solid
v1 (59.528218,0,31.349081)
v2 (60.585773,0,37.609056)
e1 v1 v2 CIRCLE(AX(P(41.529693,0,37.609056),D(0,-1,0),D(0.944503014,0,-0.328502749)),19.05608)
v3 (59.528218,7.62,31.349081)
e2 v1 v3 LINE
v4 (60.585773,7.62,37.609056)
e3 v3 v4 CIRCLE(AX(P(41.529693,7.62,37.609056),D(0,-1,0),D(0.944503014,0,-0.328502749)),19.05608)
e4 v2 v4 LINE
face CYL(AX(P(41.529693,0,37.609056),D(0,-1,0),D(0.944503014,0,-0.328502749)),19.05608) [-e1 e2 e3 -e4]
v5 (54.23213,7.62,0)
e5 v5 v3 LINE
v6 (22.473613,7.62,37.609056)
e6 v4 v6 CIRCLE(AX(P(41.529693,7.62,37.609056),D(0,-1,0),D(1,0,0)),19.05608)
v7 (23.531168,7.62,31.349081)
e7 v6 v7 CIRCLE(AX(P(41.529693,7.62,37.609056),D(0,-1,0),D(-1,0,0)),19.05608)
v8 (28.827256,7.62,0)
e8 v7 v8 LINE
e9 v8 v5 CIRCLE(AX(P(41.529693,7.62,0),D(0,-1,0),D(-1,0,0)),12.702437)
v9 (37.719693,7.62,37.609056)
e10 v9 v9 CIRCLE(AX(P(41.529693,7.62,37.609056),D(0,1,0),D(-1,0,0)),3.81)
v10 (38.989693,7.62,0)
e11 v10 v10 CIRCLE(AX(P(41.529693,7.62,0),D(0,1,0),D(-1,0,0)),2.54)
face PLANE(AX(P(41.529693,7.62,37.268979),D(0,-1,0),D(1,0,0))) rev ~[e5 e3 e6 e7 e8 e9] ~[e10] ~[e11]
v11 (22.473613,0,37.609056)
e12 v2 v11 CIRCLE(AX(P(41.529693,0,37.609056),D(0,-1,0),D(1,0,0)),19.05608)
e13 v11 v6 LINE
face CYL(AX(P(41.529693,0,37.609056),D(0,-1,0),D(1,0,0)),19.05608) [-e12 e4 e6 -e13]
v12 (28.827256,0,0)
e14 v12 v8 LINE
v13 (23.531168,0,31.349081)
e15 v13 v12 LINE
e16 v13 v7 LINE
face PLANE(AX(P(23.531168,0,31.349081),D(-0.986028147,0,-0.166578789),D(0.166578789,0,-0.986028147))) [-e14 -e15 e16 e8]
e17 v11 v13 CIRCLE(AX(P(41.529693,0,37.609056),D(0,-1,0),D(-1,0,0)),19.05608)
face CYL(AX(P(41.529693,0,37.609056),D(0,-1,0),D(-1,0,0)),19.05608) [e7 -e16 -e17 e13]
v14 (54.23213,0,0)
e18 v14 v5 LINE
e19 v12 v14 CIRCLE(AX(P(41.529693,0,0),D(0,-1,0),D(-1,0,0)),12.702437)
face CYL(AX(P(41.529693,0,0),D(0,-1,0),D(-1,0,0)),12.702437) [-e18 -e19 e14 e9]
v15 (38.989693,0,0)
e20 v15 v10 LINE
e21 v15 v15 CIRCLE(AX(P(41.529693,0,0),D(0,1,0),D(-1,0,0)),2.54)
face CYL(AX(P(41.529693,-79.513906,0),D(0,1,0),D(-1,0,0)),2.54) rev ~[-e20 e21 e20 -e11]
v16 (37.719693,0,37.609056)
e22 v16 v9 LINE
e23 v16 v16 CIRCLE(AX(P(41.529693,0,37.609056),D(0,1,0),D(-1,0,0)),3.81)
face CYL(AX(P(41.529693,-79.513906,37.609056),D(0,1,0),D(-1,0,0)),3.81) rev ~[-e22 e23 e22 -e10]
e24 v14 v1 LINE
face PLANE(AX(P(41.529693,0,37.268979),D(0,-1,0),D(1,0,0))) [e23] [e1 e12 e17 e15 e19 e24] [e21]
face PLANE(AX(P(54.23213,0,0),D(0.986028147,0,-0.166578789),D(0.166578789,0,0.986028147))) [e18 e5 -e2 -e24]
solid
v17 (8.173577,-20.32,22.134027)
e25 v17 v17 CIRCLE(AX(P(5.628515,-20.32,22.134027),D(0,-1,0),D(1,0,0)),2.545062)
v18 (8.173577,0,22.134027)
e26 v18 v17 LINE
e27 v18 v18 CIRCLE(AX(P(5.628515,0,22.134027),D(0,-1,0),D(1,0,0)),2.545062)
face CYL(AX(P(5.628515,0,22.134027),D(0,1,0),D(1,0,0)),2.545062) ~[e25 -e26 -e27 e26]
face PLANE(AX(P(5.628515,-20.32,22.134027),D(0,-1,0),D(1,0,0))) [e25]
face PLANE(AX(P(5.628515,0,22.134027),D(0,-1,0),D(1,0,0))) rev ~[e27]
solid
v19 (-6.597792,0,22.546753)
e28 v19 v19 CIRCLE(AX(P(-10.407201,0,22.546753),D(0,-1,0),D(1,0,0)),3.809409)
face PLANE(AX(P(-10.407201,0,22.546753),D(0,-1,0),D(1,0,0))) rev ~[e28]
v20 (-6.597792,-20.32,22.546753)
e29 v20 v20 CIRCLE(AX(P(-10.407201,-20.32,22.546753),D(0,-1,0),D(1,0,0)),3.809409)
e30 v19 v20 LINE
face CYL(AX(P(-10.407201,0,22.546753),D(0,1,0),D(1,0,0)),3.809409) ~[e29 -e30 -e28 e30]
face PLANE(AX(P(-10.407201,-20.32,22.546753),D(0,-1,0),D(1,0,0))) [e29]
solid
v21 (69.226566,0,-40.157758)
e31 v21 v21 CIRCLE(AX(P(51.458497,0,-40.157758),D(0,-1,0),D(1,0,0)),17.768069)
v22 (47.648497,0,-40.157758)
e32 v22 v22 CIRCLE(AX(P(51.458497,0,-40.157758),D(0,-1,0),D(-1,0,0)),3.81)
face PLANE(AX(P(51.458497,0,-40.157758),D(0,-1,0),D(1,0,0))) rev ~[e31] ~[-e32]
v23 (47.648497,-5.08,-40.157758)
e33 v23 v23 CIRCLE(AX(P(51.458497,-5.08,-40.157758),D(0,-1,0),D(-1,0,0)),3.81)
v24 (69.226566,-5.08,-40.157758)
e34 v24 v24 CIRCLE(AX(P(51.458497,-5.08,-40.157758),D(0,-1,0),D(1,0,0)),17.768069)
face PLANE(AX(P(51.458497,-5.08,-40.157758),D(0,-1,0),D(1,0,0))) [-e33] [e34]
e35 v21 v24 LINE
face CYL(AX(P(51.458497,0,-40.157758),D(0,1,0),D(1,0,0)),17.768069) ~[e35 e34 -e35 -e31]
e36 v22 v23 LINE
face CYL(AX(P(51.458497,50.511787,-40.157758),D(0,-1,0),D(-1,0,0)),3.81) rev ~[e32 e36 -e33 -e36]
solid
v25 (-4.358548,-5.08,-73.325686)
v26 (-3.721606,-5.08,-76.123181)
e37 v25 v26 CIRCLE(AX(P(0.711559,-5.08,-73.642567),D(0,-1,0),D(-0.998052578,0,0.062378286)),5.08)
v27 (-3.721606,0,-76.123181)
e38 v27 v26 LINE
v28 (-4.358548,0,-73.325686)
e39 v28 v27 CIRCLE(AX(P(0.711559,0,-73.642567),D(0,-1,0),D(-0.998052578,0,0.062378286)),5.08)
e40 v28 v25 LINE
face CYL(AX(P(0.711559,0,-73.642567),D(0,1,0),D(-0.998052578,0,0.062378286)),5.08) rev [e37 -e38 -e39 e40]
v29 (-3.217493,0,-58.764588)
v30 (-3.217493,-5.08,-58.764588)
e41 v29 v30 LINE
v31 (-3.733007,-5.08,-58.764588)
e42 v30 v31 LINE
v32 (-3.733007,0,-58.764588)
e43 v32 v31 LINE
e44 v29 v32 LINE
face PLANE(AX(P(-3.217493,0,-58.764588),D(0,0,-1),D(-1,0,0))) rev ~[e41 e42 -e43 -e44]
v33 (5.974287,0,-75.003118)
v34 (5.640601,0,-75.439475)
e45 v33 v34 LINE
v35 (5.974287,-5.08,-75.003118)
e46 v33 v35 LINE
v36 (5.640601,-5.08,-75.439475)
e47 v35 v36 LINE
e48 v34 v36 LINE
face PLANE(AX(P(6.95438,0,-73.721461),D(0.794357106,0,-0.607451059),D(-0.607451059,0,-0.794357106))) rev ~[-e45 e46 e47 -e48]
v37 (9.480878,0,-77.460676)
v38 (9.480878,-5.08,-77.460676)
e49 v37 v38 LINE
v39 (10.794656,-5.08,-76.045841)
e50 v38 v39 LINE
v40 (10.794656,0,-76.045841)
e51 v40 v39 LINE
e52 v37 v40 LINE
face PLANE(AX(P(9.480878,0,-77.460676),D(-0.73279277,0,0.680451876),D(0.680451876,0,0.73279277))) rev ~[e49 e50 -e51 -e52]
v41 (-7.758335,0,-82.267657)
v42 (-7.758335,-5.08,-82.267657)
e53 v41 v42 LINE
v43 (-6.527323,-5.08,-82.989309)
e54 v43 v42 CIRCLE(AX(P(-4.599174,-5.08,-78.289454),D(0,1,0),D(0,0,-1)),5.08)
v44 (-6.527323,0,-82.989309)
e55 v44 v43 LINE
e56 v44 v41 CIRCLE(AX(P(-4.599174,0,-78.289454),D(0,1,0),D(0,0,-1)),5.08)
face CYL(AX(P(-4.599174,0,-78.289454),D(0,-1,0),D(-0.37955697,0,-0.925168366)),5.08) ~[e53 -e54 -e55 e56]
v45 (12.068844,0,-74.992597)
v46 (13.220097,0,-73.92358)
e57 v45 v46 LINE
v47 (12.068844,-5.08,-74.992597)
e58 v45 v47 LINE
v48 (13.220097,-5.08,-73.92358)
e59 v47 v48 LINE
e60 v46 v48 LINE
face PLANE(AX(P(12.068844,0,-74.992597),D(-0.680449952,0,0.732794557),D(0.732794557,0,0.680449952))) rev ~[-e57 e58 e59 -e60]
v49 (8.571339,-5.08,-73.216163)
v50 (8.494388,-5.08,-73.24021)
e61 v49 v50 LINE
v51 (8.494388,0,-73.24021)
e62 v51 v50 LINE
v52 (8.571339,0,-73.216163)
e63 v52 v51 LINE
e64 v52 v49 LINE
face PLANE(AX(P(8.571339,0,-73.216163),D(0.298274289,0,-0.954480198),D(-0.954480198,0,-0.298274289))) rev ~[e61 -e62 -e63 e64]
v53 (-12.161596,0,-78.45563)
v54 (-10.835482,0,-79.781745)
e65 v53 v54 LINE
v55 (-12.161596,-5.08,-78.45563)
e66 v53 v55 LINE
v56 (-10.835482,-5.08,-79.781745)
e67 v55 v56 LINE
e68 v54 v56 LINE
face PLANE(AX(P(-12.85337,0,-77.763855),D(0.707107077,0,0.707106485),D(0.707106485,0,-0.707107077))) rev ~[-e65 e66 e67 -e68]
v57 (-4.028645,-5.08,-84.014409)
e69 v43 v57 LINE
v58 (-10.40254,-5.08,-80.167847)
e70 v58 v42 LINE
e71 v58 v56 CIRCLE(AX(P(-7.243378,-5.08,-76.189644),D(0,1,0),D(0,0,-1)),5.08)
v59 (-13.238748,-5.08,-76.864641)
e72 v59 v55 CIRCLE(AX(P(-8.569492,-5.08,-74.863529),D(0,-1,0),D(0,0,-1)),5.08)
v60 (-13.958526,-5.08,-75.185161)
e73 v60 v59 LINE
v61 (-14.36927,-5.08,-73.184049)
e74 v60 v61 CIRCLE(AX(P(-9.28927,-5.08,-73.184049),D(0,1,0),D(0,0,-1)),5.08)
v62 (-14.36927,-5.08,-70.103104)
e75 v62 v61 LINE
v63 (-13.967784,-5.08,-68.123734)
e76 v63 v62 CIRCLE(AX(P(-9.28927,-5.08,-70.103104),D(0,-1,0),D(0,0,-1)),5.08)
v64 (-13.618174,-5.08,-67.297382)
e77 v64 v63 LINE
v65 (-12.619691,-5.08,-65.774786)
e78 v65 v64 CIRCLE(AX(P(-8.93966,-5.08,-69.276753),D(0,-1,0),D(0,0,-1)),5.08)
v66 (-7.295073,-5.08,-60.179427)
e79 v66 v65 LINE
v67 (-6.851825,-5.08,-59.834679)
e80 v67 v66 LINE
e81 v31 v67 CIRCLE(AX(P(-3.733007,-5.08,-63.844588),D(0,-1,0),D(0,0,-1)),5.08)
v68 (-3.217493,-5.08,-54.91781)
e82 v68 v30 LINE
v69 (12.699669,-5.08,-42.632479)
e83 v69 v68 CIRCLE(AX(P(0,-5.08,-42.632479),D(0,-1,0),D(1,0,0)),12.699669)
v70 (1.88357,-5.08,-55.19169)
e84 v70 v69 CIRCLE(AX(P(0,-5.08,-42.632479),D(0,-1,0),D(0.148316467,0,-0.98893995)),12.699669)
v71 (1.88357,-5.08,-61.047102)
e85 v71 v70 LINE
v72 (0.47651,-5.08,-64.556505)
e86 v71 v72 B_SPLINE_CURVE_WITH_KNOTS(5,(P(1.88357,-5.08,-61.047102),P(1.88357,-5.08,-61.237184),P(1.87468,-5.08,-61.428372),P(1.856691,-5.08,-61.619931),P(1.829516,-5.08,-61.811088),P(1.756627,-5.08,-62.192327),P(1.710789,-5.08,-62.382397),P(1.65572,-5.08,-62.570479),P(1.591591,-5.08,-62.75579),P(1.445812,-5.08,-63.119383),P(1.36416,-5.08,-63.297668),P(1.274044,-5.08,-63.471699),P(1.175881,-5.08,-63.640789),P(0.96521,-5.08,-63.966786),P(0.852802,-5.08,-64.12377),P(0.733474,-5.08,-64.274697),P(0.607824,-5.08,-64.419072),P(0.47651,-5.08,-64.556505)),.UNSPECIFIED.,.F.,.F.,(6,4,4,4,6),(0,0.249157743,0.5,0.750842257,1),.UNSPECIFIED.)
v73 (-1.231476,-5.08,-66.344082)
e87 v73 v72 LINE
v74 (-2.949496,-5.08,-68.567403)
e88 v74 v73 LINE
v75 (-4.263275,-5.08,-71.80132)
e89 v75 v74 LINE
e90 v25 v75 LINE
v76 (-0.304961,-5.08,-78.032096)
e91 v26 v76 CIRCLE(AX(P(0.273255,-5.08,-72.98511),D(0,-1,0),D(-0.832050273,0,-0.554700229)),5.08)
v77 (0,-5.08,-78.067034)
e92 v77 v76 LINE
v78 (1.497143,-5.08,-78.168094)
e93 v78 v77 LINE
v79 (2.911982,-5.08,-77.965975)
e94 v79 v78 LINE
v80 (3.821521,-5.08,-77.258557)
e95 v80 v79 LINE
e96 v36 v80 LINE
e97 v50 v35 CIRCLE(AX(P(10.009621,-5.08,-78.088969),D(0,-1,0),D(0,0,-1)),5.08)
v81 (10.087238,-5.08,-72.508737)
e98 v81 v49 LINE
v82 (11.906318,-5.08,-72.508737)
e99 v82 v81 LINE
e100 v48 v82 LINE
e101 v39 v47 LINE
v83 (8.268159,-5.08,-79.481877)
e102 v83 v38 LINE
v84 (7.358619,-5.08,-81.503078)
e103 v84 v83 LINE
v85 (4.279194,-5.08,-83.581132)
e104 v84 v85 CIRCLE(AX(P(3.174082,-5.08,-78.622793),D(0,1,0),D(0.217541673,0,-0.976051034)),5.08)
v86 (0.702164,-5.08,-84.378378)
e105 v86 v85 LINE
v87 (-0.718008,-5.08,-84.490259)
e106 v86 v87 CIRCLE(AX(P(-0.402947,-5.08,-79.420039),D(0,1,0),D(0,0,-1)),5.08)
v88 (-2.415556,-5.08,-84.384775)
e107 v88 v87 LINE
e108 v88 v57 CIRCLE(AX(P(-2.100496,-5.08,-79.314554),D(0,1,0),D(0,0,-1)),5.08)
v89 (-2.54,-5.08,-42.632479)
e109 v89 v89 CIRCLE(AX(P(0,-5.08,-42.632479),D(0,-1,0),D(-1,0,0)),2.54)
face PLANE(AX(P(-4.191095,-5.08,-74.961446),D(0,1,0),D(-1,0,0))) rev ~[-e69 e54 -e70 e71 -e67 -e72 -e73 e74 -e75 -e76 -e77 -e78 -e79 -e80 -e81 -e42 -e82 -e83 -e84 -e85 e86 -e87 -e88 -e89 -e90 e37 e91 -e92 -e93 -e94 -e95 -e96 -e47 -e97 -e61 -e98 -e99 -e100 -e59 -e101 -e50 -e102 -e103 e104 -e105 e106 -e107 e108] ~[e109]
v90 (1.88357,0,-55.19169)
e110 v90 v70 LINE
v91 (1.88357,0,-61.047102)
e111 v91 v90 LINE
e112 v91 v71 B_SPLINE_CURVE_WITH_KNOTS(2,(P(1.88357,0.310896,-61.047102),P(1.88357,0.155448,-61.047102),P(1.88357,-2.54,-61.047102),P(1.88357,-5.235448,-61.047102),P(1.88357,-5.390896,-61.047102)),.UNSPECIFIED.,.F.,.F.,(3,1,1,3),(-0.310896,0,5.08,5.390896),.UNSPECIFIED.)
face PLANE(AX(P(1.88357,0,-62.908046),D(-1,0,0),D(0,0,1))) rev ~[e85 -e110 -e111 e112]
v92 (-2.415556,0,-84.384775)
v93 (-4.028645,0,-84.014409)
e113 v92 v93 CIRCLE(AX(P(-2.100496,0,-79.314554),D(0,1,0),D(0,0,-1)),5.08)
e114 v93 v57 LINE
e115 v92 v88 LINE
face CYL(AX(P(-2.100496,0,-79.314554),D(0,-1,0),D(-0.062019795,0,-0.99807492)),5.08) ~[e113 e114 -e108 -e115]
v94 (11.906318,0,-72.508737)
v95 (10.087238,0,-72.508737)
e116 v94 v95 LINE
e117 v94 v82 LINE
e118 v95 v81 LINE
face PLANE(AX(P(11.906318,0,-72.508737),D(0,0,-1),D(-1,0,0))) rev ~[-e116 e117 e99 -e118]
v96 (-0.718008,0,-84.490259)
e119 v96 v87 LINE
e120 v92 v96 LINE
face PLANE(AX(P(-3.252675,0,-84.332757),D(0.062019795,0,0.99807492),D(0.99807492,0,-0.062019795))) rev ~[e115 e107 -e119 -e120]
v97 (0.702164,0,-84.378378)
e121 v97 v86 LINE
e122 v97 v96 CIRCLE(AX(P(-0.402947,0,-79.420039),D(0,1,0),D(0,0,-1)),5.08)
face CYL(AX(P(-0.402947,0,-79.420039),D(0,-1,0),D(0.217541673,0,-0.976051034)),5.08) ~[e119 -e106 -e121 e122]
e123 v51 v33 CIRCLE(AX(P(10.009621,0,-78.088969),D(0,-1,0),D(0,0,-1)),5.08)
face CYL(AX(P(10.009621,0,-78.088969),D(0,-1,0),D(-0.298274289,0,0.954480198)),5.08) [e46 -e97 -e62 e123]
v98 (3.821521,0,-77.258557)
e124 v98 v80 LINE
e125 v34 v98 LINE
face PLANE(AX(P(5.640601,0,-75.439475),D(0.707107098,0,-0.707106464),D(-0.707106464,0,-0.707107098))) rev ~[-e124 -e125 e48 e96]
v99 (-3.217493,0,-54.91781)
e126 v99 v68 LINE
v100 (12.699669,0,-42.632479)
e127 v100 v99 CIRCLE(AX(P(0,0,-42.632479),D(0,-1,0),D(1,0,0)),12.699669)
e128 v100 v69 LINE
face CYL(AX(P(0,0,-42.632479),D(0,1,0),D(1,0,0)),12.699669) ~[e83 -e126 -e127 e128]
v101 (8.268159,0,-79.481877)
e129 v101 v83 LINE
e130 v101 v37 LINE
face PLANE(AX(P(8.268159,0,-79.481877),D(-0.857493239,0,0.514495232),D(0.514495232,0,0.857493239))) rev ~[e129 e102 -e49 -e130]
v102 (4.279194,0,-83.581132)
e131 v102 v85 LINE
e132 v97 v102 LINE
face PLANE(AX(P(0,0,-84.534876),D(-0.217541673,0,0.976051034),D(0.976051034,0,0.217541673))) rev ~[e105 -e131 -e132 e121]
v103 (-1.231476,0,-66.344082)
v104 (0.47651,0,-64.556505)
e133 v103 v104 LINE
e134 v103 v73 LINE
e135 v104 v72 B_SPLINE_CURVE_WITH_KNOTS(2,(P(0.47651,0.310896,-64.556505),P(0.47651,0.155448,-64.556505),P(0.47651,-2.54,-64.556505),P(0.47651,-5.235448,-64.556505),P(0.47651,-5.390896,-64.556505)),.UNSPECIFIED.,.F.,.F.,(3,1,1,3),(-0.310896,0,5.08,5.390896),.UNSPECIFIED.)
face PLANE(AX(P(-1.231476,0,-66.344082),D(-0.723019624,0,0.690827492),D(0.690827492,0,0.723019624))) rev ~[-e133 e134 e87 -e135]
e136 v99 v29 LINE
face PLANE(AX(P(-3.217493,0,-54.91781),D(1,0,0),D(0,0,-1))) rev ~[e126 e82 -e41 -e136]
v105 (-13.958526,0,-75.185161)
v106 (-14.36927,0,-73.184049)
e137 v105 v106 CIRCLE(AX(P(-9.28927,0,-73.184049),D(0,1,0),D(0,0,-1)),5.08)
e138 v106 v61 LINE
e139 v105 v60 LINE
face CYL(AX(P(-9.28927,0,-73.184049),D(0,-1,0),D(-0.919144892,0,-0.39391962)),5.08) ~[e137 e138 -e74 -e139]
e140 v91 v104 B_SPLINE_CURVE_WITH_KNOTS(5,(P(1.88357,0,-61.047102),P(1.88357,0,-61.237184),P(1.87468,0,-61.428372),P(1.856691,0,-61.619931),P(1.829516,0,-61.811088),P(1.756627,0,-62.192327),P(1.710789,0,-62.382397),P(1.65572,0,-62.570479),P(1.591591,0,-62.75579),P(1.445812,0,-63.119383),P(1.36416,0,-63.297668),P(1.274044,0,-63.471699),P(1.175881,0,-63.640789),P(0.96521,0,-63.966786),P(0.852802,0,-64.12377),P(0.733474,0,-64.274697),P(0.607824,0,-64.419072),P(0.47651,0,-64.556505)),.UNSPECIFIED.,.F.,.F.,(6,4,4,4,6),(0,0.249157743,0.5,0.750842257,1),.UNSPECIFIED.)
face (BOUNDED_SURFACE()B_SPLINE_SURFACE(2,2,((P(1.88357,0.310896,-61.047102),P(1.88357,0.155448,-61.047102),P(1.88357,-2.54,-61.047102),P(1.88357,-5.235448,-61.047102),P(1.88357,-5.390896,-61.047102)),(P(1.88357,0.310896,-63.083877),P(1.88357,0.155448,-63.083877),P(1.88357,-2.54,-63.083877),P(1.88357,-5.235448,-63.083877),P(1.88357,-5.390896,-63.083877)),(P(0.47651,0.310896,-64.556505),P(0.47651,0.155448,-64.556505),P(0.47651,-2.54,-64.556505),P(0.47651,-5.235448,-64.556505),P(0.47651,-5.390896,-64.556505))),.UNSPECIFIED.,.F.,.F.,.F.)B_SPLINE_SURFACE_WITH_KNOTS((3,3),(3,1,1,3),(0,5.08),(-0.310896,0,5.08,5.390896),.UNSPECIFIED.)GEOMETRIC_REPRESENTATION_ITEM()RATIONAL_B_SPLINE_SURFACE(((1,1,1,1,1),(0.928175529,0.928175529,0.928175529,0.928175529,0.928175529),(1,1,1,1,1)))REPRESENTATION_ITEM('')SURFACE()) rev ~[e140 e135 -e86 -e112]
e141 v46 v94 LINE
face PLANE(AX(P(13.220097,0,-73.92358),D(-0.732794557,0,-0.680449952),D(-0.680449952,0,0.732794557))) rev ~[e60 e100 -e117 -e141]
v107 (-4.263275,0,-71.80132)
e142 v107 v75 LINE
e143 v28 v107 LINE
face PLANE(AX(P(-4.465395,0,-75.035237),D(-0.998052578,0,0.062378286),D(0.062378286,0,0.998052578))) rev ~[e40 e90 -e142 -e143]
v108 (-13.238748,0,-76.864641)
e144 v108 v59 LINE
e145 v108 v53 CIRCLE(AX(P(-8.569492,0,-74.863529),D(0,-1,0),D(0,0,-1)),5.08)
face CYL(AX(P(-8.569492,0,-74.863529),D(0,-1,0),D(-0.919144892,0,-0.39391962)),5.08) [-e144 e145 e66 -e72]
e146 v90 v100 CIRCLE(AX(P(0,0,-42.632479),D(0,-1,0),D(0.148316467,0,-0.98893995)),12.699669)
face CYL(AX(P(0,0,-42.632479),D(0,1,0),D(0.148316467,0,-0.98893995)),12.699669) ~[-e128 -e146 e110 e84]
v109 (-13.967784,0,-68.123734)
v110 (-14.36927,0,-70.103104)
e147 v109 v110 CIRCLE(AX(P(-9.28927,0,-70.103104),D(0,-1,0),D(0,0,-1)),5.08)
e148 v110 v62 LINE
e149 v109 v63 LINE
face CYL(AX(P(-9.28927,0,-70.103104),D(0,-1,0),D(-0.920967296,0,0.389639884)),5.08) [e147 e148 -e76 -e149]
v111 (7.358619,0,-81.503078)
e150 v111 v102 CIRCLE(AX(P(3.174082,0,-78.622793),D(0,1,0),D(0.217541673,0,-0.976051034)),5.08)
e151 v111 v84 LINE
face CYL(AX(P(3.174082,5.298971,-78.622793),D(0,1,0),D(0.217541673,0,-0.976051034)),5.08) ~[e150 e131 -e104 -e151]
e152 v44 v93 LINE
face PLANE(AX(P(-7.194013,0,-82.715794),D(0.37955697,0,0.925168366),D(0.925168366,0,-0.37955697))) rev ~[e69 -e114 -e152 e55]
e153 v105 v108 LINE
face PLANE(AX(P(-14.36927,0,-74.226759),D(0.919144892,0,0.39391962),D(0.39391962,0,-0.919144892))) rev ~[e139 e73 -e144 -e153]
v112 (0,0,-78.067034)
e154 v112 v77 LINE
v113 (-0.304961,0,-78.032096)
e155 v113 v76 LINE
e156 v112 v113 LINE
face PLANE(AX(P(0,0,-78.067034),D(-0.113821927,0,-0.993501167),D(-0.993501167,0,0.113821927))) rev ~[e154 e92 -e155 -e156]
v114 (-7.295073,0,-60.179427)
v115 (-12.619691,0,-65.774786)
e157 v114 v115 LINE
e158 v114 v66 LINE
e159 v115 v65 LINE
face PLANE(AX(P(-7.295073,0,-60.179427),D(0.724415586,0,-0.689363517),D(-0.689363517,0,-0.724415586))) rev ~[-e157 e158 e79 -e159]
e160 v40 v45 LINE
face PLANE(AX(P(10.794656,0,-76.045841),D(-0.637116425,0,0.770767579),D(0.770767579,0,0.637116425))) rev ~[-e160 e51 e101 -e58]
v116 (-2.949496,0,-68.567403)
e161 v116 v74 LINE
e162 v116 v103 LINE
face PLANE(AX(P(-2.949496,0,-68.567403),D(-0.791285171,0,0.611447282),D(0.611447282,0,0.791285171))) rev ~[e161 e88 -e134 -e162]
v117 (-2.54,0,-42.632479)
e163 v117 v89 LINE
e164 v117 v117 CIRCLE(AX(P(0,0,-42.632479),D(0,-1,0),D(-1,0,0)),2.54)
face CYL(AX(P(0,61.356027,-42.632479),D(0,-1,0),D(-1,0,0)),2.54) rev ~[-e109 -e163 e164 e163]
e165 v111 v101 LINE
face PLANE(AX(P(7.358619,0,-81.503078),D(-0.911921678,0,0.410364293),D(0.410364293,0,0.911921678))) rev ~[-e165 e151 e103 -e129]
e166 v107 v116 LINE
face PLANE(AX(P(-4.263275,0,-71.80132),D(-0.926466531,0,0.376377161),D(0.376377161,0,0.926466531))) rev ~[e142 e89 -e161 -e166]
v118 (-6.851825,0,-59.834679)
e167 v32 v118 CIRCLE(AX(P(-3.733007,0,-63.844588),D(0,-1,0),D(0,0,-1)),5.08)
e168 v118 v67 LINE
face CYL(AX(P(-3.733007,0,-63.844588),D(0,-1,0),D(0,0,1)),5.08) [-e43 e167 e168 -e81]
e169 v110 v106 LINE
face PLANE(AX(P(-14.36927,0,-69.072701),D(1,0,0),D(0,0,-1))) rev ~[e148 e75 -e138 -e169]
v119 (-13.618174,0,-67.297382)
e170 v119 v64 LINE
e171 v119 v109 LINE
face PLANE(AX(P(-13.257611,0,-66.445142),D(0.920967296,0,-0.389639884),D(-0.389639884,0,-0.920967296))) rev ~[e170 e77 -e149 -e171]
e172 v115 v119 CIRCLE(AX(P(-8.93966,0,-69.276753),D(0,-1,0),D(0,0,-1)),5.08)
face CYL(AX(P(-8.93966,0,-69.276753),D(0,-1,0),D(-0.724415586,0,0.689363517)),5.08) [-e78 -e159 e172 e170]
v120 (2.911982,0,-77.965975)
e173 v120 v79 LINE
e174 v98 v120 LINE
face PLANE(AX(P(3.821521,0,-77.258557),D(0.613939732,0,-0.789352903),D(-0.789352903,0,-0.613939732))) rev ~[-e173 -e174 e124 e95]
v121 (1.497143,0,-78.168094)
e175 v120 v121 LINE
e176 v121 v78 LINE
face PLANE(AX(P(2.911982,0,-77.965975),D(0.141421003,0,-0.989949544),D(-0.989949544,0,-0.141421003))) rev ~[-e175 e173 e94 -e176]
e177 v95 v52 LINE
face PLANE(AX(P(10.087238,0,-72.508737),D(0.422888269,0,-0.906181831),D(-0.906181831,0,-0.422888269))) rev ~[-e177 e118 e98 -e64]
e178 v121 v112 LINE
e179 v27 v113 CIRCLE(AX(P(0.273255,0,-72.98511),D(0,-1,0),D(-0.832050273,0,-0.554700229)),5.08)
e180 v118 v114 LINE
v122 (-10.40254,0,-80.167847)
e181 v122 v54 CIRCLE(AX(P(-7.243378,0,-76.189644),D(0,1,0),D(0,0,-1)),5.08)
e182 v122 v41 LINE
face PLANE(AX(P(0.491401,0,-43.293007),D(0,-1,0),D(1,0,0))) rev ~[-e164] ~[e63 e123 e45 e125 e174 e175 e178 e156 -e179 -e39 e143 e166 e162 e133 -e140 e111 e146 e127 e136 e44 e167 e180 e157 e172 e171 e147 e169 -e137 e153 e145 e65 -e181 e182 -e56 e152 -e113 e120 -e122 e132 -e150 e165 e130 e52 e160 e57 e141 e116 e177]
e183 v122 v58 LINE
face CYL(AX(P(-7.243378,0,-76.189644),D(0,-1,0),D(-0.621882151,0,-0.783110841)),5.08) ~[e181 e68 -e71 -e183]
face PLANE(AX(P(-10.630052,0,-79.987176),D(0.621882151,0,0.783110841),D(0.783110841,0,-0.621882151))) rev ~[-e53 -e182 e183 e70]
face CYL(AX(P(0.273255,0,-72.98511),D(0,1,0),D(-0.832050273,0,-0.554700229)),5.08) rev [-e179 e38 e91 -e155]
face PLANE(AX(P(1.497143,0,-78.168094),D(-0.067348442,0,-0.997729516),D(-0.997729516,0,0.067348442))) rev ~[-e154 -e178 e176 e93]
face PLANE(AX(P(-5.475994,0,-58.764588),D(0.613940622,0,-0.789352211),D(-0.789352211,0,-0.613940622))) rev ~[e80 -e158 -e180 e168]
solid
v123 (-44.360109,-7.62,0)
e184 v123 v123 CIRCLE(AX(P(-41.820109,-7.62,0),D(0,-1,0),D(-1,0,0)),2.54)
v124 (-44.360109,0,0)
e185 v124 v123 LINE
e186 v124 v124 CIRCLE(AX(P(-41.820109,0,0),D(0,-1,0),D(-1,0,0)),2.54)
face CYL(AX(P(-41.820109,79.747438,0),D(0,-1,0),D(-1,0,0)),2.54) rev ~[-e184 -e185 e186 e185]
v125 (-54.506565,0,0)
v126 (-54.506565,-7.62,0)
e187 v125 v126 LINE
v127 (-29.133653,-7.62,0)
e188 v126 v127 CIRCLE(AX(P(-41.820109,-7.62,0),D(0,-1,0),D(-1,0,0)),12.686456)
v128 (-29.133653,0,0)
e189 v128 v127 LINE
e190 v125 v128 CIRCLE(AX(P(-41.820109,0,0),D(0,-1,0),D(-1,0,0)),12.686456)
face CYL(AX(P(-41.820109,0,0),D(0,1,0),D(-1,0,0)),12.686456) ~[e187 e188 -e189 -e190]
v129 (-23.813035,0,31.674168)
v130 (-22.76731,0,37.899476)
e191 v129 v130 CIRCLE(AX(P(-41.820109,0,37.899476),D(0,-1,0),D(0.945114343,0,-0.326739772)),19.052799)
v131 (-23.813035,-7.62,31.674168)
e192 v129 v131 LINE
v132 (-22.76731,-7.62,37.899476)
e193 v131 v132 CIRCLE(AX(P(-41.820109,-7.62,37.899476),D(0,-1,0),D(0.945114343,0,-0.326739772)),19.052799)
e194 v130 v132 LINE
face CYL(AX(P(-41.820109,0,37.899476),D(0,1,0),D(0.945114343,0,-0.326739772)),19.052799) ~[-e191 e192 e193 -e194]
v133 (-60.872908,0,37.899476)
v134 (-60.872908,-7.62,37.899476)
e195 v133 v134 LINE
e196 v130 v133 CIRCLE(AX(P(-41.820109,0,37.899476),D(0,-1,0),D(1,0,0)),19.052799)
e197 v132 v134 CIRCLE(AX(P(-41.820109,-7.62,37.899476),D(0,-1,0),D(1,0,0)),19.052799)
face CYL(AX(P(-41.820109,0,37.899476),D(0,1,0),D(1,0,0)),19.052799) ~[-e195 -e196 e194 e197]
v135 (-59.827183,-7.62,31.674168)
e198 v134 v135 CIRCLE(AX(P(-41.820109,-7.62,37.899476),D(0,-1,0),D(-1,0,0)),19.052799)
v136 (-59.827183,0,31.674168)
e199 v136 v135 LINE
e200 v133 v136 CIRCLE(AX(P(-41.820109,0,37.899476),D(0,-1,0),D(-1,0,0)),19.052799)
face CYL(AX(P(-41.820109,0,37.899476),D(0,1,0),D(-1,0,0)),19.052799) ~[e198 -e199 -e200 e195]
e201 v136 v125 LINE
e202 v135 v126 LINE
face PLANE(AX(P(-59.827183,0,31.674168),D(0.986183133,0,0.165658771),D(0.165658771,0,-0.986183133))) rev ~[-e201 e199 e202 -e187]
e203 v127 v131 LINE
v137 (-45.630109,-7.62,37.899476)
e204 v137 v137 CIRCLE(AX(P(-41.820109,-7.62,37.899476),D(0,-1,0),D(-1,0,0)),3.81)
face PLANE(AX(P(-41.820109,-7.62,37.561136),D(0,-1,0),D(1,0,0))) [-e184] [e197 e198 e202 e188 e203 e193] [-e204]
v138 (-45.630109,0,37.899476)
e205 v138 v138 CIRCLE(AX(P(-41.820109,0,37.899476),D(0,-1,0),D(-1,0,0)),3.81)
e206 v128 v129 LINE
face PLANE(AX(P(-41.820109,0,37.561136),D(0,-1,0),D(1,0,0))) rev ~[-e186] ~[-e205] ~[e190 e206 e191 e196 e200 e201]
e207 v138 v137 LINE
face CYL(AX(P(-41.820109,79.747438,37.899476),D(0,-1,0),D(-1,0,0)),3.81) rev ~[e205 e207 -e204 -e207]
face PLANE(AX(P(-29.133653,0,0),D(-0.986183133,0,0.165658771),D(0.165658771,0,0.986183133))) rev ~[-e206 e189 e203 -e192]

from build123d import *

# Parameters (mm, degrees)
F1_DEPTH     = 7.62
F2_D         = 5.08
F4_DEPTH     = 7.62
F5_D         = 7.62
F6_D         = 7.62
F7_D         = 5.08
F9_DEPTH     = 5.08
F10_T1_DEPTH = 15.6779412076
F11_R        = 5.08
F12_R        = 5.08
F13_R        = 5.08
F14_T1_DEPTH = 5.08
F14_F3_R     = 5.08
F15_R        = 5.08
F16_D        = 5.08
F17_R        = 17.7680692018
F18_DEPTH    = 5.08
F19_D        = 7.62
F20_R        = 3.8094085712
F21_DEPTH    = 20.32
F20_R_2      = 2.5450619433


# Not quite as in the source:
# - a fillet or chamfer that OpenCascade refuses, or shapes differently, is made with other operations: its cross-section is extruded or revolved along the edge and cut away or added


with BuildPart() as f1:
    # F0 (on Front) → F1 (new body)
    with BuildSketch(Plane.XZ):
        with BuildLine():
            Line((-23.8130350034, 31.6741682533), (-22.7673095988, 37.8994755447))
            ThreePointArc((-22.7673095988, 37.8994755447), (-41.8201088905, 56.9522748364), (-60.8729081823, 37.8994755447))
            Line((-60.8729081823, 37.8994755447), (-59.8271827777, 31.6741682533))
            ThreePointArc((-59.8271827777, 31.6741682533), (-41.8201088905, 18.846676253), (-23.8130350034, 31.6741682533))
        make_face()
        with BuildLine():
            ThreePointArc((-23.8130350034, 31.6741682533), (-23.0305595951, 34.7432122281), (-22.7673095988, 37.8994755447))
            Line((-22.7673095988, 37.8994755447), (-23.8130350034, 31.6741682533))
        make_face()
        with BuildLine():
            Line((-59.8271827777, 31.6741682533), (-60.8729081823, 37.8994755447))
            ThreePointArc((-60.8729081823, 37.8994755447), (-60.609658186, 34.7432122281), (-59.8271827777, 31.6741682533))
        make_face()
        with BuildLine():
            Line((-29.1336530644, 0), (-23.8130350034, 31.6741682533))
            ThreePointArc((-23.8130350034, 31.6741682533), (-41.8201088905, 18.846676253), (-59.8271827777, 31.6741682533))
            Line((-59.8271827777, 31.6741682533), (-54.5065647167, 0))
            ThreePointArc((-54.5065647167, 0), (-41.8201088905, 12.6864558261), (-29.1336530644, 0))
        make_face()
        with BuildLine():
            ThreePointArc((-54.5065647167, 0), (-41.8201088905, -12.6864558261), (-29.1336530644, 0))
            ThreePointArc((-29.1336530644, 0), (-41.8201088905, 12.6864558261), (-54.5065647167, 0))
        make_face()
    extrude(amount=F1_DEPTH)

    # F2 (through all)
    with Locations(Plane(origin=(0, 0, 0), x_dir=(1, 0, 0), z_dir=(0, 1, 0))):
        with Locations((-41.8201088905, 0)):
            Hole(F2_D / 2)

    # F5 (through all)
    with Locations(Plane(origin=(0, 0, 0), x_dir=(1, 0, 0), z_dir=(0, 1, 0))):
        with Locations((-41.8201088905, -37.8994755447)):
            Hole(F5_D / 2)


with BuildPart() as f4:
    # F3 (on Front) → F4 (new body)
    with BuildSketch(Plane.XZ):
        with BuildLine():
            Line((59.5282177794, 31.3490809442), (60.5857727855, 37.6090556383))
            ThreePointArc((60.5857727855, 37.6090556383), (41.5296927094, 56.6651357143), (22.4736126334, 37.6090556383))
            Line((22.4736126334, 37.6090556383), (23.5311676395, 31.3490809442))
            ThreePointArc((23.5311676395, 31.3490809442), (41.5296927094, 18.5529755623), (59.5282177794, 31.3490809442))
        make_face()
        with BuildLine():
            ThreePointArc((59.5282177794, 31.3490809442), (60.3195240398, 34.4347168977), (60.5857727855, 37.6090556383))
            Line((60.5857727855, 37.6090556383), (59.5282177794, 31.3490809442))
        make_face()
        with BuildLine():
            Line((23.5311676395, 31.3490809442), (22.4736126334, 37.6090556383))
            ThreePointArc((22.4736126334, 37.6090556383), (22.7398613791, 34.4347168977), (23.5311676395, 31.3490809442))
        make_face()
        with BuildLine():
            Line((54.2321296786, 0), (59.5282177794, 31.3490809442))
            ThreePointArc((59.5282177794, 31.3490809442), (41.5296927094, 18.5529755623), (23.5311676395, 31.3490809442))
            Line((23.5311676395, 31.3490809442), (28.8272557403, 0))
            ThreePointArc((28.8272557403, 0), (41.5296927094, 12.7024369691), (54.2321296786, 0))
        make_face()
        with BuildLine():
            ThreePointArc((28.8272557403, 0), (41.5296927094, -12.7024369691), (54.2321296786, 0))
            ThreePointArc((54.2321296786, 0), (41.5296927094, 12.7024369691), (28.8272557403, 0))
        make_face()
    extrude(amount=-F4_DEPTH)

    # F6 (through all)
    with Locations(Plane.XZ):
        with Locations((41.5296927094, 37.6090556383)):
            Hole(F6_D / 2)

    # F7 (through all)
    with Locations(Plane.XZ):
        with Locations((41.5296927094, 0)):
            Hole(F7_D / 2)


with BuildPart() as f9:
    # F8 (on Front) → F9 (new body)
    with BuildSketch(Plane.XZ):
        with BuildLine():
            ThreePointArc((1.8835700949, -55.1916896292), (9.6229496478, -50.9198456578), (12.699669381, -42.6324792206))
            ThreePointArc((12.699669381, -42.6324792206), (-7.7595267274, -32.5790545626), (-3.2174926052, -54.9178096486))
            ThreePointArc((-3.2174926052, -54.9178096486), (-0.6808743473, -55.3138834217), (1.8835700949, -55.1916896292))
        make_face()
        with BuildLine():
            ThreePointArc((1.8835700949, -55.1916896292), (-0.6808743473, -55.3138834217), (-3.2174926052, -54.9178096486))
            Line((-3.2174926052, -54.9178096486), (-3.2174926052, -58.7645881589))
            Line((-3.2174926052, -58.7645881589), (-5.4759941995, -58.7645881589))
            Line((-5.4759941995, -58.7645881589), (-7.29507301, -60.1794272661))
            Line((-7.29507301, -60.1794272661), (-13.2576106116, -66.4451420307))
            Line((-13.2576106116, -66.4451420307), (-14.369269833, -69.0727010369))
            Line((-14.369269833, -69.0727010369), (-14.369269833, -71.5992003679))
            Line((-14.369269833, -71.5992003679), (-14.369269833, -74.2267593741))
            Line((-14.369269833, -74.2267593741), (-12.8533700481, -77.7638554573))
            Line((-12.8533700481, -77.7638554573), (-10.6300516054, -79.9871757627))
            Line((-10.6300516054, -79.9871757627), (-7.1940133348, -82.7157944441))
            Line((-7.1940133348, -82.7157944441), (-3.2526752912, -84.3327566981))
            Line((-3.2526752912, -84.3327566981), (0, -84.5348760486))
            Line((0, -84.5348760486), (6.3480199315, -83.120033145))
            Line((6.3480199315, -83.120033145), (7.3586194776, -81.5030783415))
            Line((7.3586194776, -81.5030783415), (8.2681588829, -79.4818773866))
            Line((8.2681588829, -79.4818773866), (9.4808777794, -77.4606764317))
            Line((9.4808777794, -77.4606764317), (10.7946563512, -76.0458409786))
            Line((10.7946563512, -76.0458409786), (12.0688441613, -74.9925974282))
            Line((12.0688441613, -74.9925974282), (13.2200969383, -73.9235803485))
            Line((13.2200969383, -73.9235803485), (11.9063183665, -72.5087374449))
            Line((11.9063183665, -72.5087374449), (10.0872376934, -72.5087374449))
            Line((10.0872376934, -72.5087374449), (8.5713388398, -73.216162622))
            Line((8.5713388398, -73.216162622), (6.9543798454, -73.7214609981))
            Line((6.9543798454, -73.7214609981), (5.640600808, -75.4394754767))
            Line((5.640600808, -75.4394754767), (3.8215208333, -77.2585570812))
            Line((3.8215208333, -77.2585570812), (2.9119816609, -77.9659748077))
            Line((2.9119816609, -77.9659748077), (1.497142599, -78.1680941582))
            Line((1.497142599, -78.1680941582), (0, -78.067034483))
            Line((0, -78.067034483), (-2.6463153772, -77.7638554573))
            Line((-2.6463153772, -77.7638554573), (-4.4653946534, -75.0352367759))
            Line((-4.4653946534, -75.0352367759), (-4.2632748373, -71.8013197184))
            Line((-4.2632748373, -71.8013197184), (-2.949495567, -68.5674026608))
            Line((-2.949495567, -68.5674026608), (-1.2314763153, -66.3440823555))
            Line((-1.2314763153, -66.3440823555), (0.8931973609, -64.120400207))
            Line((0.8931973609, -64.120400207), (1.8835700949, -62.9080462995))
            Line((1.8835700949, -62.9080462995), (1.8835700949, -61.3925094736))
            Line((1.8835700949, -61.3925094736), (1.8835700949, -59.169189184))
            Line((1.8835700949, -59.169189184), (1.8835700949, -55.1916896292))
        make_face()
    extrude(amount=F9_DEPTH)

    # F10: fillet of radius 5.08 on 1 edges, made by hand

    # F10_s2 → F10_t1 (cut)
    with BuildSketch(Plane.XZ.offset(-5.2989706038)):
        with BuildLine():
            ThreePointArc((4.2791936374, -83.5811319179), (6.0156790125, -82.833698277), (7.3586194776, -81.5030783415))
            Line((7.3586194776, -81.5030783415), (6.3480199315, -83.120033145))
            Line((6.3480199315, -83.120033145), (4.2791936374, -83.5811319179))
        make_face()
    extrude(amount=F10_T1_DEPTH, mode=Mode.SUBTRACT)

    # F11
    f11_edges = [f9.edges().sort_by_distance(p)[0] for p in [
        (-3.252675, -2.54, -84.332757),
        (-7.194013, -2.54, -82.715794),
        (-10.630052, -2.54, -79.987176),
        (0, -2.54, -84.534876),
    ]]
    fillet(f11_edges, radius=F11_R)

    # F12
    f12_edges = [f9.edges().sort_by_distance(p)[0] for p in [
        (6.95438, -2.54, -73.721461),
    ]]
    fillet(f12_edges, radius=F12_R)

    # F13
    f13_edges = [f9.edges().sort_by_distance(p)[0] for p in [
        (-14.36927, -2.54, -74.226759),
        (-5.475994, -2.54, -58.764588),
    ]]
    fillet(f13_edges, radius=F13_R)

    # F14: fillet of radius 5.08 on 3 edges, made by hand

    # F14_s2 → F14_t1 (join)
    with BuildSketch(Plane.XZ):
        with BuildLine():
            ThreePointArc((-4.3585477158, -73.3256857753), (-4.1940364205, -74.9622378117), (-3.5152560014, -76.4604446322))
            Line((-3.5152560014, -76.4604446322), (-3.5997923091, -76.5168021755))
            Line((-3.5997923091, -76.5168021755), (-4.5689337341, -75.063090162))
            Line((-4.5689337341, -75.063090162), (-4.4599498578, -73.3193481414))
            Line((-4.4599498578, -73.3193481414), (-4.3585477158, -73.3256857753))
        make_face()
        with BuildLine():
            ThreePointArc((-3.9535608414, -75.8029874283), (-2.3752000359, -77.3200945031), (-0.3049608466, -78.0320961936))
            Line((-0.3049608466, -78.0320961936), (-0.3165251543, -78.1330359122))
            Line((-0.3165251543, -78.1330359122), (-2.7047067756, -77.8594303612))
            Line((-2.7047067756, -77.8594303612), (-4.0380971491, -75.8593449716))
            Line((-4.0380971491, -75.8593449716), (-3.9535608414, -75.8029874283))
        make_face()
    extrude(amount=F14_T1_DEPTH)

    # F14_f3
    f14_f3_edges = [f9.edges().sort_by_distance(p)[0] for p in [
        (1.8835700949, -2.54, -62.9080462995),
    ]]
    fillet(f14_f3_edges, radius=F14_F3_R)

    # F15
    f15_edges = [f9.edges().sort_by_distance(p)[0] for p in [
        (-13.257611, -2.54, -66.445142),
        (-14.36927, -2.54, -69.072701),
        (-12.85337, -2.54, -77.763855),
    ]]
    fillet(f15_edges, radius=F15_R)

    # F16 (through all)
    with Locations(Plane(origin=(0, 0, 0), x_dir=(1, 0, 0), z_dir=(0, 1, 0))):
        with Locations((0, 42.6324792206)):
            Hole(F16_D / 2)


with BuildPart() as f18:
    # F17 (on Front) → F18 (new body)
    with BuildSketch(Plane.XZ):
        with Locations((51.4584966004, -40.1577576995)):
            Circle(F17_R)
    extrude(amount=F18_DEPTH)

    # F19 (through all)
    with Locations(Plane(origin=(0, 0, 0), x_dir=(1, 0, 0), z_dir=(0, 1, 0))):
        with Locations((51.4584966004, 40.1577576995)):
            Hole(F19_D / 2)


with BuildPart() as f21:
    # F20 (on Front) → F21 (new body)
    with BuildSketch(Plane.XZ):
        with Locations((-10.4072010145, 22.5467532873)):
            Circle(F20_R)
    extrude(amount=F21_DEPTH)


with BuildPart() as f21b:
    # F20 (on Front) → F21, piece 2 (new body)
    with BuildSketch(Plane.XZ):
        with Locations((5.6285150349, 22.1340265125)):
            Circle(F20_R_2)
    extrude(amount=F21_DEPTH)


solid = Compound([f1.part, f4.part, f9.part, f18.part, f21.part, f21b.part])
